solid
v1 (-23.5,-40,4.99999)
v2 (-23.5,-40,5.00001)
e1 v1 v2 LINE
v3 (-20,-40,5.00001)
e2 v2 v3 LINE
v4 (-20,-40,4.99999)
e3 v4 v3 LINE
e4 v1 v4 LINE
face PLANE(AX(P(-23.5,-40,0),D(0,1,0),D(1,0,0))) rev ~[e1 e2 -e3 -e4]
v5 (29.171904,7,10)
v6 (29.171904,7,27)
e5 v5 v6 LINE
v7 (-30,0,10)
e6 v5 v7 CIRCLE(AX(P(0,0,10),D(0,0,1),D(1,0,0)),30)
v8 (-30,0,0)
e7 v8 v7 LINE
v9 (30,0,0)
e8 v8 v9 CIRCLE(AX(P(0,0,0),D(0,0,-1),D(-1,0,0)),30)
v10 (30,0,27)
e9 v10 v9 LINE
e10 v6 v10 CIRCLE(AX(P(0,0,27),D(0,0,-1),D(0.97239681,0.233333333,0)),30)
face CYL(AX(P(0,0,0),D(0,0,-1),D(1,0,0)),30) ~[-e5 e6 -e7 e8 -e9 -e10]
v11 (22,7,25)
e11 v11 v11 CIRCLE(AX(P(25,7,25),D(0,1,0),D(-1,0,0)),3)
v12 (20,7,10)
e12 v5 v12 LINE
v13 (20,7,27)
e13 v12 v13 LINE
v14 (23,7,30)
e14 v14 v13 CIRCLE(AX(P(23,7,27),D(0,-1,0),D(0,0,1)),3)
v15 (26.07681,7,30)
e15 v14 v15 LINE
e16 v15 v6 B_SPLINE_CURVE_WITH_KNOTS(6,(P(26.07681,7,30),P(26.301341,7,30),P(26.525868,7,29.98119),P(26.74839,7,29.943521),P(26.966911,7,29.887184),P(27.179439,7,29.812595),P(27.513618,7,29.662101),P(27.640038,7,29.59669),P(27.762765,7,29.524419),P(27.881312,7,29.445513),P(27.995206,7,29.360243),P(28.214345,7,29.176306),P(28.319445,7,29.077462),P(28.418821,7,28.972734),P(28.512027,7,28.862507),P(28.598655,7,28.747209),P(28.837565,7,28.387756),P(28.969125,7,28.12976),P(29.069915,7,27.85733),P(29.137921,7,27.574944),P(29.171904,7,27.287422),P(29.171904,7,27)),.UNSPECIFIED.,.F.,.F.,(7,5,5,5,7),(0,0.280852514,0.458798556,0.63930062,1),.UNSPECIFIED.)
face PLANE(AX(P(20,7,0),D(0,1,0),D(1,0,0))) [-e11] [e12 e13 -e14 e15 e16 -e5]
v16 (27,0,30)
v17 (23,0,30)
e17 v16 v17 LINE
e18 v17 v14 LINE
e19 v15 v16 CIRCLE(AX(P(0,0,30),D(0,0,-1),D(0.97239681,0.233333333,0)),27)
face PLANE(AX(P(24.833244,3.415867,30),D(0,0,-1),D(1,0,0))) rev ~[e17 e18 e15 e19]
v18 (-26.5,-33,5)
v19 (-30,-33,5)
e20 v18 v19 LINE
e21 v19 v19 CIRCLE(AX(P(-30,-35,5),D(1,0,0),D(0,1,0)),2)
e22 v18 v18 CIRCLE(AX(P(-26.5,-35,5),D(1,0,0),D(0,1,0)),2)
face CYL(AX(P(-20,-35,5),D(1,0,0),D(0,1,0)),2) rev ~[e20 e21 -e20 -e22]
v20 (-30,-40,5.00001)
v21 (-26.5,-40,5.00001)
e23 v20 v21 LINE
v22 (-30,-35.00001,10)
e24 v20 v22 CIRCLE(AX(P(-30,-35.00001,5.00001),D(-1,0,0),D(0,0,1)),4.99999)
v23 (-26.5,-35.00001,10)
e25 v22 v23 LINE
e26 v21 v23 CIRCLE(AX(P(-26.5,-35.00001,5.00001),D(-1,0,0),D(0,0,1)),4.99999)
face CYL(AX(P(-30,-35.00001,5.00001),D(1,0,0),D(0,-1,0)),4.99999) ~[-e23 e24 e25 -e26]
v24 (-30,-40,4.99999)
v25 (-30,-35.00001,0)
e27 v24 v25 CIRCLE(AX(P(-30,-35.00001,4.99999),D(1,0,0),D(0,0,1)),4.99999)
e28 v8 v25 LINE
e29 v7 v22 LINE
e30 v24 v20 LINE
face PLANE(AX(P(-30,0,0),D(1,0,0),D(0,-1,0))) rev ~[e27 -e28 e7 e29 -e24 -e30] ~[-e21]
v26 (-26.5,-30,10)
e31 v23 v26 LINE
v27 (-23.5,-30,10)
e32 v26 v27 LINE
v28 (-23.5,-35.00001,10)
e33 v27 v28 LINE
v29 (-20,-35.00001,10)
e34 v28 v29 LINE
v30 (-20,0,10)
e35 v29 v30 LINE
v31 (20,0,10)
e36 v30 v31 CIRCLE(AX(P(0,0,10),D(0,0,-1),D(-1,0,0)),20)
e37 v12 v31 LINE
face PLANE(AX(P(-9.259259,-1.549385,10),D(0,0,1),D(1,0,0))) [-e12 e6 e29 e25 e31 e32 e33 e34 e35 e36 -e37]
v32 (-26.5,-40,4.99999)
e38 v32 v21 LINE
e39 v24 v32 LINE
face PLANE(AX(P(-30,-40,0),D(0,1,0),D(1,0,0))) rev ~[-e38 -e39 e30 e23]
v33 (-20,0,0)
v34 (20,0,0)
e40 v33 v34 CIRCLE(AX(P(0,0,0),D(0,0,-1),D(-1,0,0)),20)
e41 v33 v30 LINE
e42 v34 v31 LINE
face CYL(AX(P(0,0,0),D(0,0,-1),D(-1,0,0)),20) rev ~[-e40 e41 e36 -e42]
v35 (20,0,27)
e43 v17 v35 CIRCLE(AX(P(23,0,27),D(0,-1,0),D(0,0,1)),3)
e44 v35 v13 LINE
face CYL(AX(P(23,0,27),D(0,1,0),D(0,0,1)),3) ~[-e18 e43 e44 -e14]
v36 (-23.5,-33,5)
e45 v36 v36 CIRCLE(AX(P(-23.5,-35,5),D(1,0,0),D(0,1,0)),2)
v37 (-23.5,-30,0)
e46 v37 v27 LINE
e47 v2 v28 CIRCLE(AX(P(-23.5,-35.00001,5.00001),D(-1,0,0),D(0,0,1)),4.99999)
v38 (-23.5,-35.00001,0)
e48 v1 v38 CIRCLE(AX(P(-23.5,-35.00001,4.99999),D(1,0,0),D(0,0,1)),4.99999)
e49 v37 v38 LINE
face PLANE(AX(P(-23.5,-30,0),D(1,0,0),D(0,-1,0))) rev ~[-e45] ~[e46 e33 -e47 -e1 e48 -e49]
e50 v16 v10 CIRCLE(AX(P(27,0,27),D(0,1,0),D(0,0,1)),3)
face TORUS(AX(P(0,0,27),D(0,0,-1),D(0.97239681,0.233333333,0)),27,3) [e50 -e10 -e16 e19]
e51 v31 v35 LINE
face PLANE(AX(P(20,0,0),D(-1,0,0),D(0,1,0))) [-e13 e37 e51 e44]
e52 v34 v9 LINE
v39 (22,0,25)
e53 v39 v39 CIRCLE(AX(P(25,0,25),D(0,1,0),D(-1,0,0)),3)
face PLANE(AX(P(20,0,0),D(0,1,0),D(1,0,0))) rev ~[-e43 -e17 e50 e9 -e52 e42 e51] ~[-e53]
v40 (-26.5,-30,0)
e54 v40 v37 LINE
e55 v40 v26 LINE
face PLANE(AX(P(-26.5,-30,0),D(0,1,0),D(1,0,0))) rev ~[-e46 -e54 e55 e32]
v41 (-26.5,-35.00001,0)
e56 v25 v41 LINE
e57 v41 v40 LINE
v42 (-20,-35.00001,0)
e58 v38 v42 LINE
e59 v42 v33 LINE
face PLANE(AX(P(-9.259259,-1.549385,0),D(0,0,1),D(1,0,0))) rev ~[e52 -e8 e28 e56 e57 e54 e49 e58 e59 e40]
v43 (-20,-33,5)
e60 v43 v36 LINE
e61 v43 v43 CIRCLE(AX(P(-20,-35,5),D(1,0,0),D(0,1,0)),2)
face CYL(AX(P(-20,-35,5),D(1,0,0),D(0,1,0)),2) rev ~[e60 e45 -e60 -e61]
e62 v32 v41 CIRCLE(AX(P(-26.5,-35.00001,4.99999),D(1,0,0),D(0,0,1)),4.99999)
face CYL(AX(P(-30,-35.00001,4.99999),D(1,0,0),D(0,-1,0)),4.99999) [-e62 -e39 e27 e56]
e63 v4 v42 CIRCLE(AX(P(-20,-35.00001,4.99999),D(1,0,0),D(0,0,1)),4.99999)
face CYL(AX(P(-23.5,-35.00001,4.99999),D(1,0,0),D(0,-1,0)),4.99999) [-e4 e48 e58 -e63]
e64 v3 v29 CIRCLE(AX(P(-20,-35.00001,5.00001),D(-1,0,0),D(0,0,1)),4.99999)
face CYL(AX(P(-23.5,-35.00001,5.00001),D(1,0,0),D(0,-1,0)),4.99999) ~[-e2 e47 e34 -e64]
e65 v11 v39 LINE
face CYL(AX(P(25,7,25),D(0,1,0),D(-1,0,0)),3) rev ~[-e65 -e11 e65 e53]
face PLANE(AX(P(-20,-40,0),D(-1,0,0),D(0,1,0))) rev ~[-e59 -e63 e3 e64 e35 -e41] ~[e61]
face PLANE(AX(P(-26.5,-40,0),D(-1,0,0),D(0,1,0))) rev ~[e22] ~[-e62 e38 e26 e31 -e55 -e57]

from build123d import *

# Parameters (mm, degrees)
F1_DEPTH = 10
F2_R     = 4.99999
F3_R     = 2
F4_DEPTH = 25
F6_DEPTH = 30
F7_R     = 3
F8_R     = 3
F9_DEPTH = 25


# Not quite as in the source:
# - a fillet or chamfer is up to 0.001 mm smaller than in the source, because OpenCascade refuses the exact size


with BuildPart() as f1:
    # F0 (on Top) → F1 (new body)
    with BuildSketch(Plane.XY):
        with BuildLine():
            ThreePointArc((-20, 0), (0, 20), (20, 0))
            Line((20, 0), (30, 0))
            ThreePointArc((30, 0), (0, 30), (-30, 0))
            Line((-30, 0), (-30, -40))
            Line((-30, -40), (-26.5, -40))
            Line((-26.5, -40), (-26.5, -30))
            Line((-26.5, -30), (-23.5, -30))
            Line((-23.5, -30), (-23.5, -40))
            Line((-23.5, -40), (-20, -40))
            Line((-20, -40), (-20, 0))
        make_face()
    extrude(amount=F1_DEPTH)

    # F2 (radius 5 in the source; OpenCascade refuses exactly that, so slightly less here)
    f2_edges = [f1.edges().sort_by_distance(p)[0] for p in [
        (-28.25, -40, 10),
        (-28.25, -40, 0),
        (-21.75, -40, 10),
        (-21.75, -40, 0),
    ]]
    fillet(f2_edges, radius=F2_R)

    # F3 (on face) → F4 (cut)
    with BuildSketch(Plane.YZ.offset(-20)):
        with Locations((-35, 5)):
            Circle(F3_R)
    extrude(amount=-F4_DEPTH, mode=Mode.SUBTRACT)

    # F5 (on face) → F6 (join)
    with BuildSketch(Plane(origin=(0, 0, 0), x_dir=(1, 0, 0), z_dir=(0, 0, -1))):
        with BuildLine():
            ThreePointArc((29.1719042916, -7), (29.7922567855, -3.5244057124), (30, 0))
            Line((30, 0), (20, 0))
            Line((20, 0), (20, -7))
            Line((20, -7), (29.1719042916, -7))
        make_face()
    extrude(amount=-F6_DEPTH)

    # F7
    f7_edges = [f1.edges().sort_by_distance(p)[0] for p in [
        (29.792257, 3.524406, 30),
        (20, 3.5, 30),
    ]]
    fillet(f7_edges, radius=F7_R)

    # F8 (on face) → F9 (cut)
    with BuildSketch(Plane(origin=(0, 7, 0), x_dir=(-1, 0, 0), z_dir=(0, 1, 0))):
        with Locations((-25, 25)):
            Circle(F8_R)
    extrude(amount=-F9_DEPTH, mode=Mode.SUBTRACT)


solid = f1.part
